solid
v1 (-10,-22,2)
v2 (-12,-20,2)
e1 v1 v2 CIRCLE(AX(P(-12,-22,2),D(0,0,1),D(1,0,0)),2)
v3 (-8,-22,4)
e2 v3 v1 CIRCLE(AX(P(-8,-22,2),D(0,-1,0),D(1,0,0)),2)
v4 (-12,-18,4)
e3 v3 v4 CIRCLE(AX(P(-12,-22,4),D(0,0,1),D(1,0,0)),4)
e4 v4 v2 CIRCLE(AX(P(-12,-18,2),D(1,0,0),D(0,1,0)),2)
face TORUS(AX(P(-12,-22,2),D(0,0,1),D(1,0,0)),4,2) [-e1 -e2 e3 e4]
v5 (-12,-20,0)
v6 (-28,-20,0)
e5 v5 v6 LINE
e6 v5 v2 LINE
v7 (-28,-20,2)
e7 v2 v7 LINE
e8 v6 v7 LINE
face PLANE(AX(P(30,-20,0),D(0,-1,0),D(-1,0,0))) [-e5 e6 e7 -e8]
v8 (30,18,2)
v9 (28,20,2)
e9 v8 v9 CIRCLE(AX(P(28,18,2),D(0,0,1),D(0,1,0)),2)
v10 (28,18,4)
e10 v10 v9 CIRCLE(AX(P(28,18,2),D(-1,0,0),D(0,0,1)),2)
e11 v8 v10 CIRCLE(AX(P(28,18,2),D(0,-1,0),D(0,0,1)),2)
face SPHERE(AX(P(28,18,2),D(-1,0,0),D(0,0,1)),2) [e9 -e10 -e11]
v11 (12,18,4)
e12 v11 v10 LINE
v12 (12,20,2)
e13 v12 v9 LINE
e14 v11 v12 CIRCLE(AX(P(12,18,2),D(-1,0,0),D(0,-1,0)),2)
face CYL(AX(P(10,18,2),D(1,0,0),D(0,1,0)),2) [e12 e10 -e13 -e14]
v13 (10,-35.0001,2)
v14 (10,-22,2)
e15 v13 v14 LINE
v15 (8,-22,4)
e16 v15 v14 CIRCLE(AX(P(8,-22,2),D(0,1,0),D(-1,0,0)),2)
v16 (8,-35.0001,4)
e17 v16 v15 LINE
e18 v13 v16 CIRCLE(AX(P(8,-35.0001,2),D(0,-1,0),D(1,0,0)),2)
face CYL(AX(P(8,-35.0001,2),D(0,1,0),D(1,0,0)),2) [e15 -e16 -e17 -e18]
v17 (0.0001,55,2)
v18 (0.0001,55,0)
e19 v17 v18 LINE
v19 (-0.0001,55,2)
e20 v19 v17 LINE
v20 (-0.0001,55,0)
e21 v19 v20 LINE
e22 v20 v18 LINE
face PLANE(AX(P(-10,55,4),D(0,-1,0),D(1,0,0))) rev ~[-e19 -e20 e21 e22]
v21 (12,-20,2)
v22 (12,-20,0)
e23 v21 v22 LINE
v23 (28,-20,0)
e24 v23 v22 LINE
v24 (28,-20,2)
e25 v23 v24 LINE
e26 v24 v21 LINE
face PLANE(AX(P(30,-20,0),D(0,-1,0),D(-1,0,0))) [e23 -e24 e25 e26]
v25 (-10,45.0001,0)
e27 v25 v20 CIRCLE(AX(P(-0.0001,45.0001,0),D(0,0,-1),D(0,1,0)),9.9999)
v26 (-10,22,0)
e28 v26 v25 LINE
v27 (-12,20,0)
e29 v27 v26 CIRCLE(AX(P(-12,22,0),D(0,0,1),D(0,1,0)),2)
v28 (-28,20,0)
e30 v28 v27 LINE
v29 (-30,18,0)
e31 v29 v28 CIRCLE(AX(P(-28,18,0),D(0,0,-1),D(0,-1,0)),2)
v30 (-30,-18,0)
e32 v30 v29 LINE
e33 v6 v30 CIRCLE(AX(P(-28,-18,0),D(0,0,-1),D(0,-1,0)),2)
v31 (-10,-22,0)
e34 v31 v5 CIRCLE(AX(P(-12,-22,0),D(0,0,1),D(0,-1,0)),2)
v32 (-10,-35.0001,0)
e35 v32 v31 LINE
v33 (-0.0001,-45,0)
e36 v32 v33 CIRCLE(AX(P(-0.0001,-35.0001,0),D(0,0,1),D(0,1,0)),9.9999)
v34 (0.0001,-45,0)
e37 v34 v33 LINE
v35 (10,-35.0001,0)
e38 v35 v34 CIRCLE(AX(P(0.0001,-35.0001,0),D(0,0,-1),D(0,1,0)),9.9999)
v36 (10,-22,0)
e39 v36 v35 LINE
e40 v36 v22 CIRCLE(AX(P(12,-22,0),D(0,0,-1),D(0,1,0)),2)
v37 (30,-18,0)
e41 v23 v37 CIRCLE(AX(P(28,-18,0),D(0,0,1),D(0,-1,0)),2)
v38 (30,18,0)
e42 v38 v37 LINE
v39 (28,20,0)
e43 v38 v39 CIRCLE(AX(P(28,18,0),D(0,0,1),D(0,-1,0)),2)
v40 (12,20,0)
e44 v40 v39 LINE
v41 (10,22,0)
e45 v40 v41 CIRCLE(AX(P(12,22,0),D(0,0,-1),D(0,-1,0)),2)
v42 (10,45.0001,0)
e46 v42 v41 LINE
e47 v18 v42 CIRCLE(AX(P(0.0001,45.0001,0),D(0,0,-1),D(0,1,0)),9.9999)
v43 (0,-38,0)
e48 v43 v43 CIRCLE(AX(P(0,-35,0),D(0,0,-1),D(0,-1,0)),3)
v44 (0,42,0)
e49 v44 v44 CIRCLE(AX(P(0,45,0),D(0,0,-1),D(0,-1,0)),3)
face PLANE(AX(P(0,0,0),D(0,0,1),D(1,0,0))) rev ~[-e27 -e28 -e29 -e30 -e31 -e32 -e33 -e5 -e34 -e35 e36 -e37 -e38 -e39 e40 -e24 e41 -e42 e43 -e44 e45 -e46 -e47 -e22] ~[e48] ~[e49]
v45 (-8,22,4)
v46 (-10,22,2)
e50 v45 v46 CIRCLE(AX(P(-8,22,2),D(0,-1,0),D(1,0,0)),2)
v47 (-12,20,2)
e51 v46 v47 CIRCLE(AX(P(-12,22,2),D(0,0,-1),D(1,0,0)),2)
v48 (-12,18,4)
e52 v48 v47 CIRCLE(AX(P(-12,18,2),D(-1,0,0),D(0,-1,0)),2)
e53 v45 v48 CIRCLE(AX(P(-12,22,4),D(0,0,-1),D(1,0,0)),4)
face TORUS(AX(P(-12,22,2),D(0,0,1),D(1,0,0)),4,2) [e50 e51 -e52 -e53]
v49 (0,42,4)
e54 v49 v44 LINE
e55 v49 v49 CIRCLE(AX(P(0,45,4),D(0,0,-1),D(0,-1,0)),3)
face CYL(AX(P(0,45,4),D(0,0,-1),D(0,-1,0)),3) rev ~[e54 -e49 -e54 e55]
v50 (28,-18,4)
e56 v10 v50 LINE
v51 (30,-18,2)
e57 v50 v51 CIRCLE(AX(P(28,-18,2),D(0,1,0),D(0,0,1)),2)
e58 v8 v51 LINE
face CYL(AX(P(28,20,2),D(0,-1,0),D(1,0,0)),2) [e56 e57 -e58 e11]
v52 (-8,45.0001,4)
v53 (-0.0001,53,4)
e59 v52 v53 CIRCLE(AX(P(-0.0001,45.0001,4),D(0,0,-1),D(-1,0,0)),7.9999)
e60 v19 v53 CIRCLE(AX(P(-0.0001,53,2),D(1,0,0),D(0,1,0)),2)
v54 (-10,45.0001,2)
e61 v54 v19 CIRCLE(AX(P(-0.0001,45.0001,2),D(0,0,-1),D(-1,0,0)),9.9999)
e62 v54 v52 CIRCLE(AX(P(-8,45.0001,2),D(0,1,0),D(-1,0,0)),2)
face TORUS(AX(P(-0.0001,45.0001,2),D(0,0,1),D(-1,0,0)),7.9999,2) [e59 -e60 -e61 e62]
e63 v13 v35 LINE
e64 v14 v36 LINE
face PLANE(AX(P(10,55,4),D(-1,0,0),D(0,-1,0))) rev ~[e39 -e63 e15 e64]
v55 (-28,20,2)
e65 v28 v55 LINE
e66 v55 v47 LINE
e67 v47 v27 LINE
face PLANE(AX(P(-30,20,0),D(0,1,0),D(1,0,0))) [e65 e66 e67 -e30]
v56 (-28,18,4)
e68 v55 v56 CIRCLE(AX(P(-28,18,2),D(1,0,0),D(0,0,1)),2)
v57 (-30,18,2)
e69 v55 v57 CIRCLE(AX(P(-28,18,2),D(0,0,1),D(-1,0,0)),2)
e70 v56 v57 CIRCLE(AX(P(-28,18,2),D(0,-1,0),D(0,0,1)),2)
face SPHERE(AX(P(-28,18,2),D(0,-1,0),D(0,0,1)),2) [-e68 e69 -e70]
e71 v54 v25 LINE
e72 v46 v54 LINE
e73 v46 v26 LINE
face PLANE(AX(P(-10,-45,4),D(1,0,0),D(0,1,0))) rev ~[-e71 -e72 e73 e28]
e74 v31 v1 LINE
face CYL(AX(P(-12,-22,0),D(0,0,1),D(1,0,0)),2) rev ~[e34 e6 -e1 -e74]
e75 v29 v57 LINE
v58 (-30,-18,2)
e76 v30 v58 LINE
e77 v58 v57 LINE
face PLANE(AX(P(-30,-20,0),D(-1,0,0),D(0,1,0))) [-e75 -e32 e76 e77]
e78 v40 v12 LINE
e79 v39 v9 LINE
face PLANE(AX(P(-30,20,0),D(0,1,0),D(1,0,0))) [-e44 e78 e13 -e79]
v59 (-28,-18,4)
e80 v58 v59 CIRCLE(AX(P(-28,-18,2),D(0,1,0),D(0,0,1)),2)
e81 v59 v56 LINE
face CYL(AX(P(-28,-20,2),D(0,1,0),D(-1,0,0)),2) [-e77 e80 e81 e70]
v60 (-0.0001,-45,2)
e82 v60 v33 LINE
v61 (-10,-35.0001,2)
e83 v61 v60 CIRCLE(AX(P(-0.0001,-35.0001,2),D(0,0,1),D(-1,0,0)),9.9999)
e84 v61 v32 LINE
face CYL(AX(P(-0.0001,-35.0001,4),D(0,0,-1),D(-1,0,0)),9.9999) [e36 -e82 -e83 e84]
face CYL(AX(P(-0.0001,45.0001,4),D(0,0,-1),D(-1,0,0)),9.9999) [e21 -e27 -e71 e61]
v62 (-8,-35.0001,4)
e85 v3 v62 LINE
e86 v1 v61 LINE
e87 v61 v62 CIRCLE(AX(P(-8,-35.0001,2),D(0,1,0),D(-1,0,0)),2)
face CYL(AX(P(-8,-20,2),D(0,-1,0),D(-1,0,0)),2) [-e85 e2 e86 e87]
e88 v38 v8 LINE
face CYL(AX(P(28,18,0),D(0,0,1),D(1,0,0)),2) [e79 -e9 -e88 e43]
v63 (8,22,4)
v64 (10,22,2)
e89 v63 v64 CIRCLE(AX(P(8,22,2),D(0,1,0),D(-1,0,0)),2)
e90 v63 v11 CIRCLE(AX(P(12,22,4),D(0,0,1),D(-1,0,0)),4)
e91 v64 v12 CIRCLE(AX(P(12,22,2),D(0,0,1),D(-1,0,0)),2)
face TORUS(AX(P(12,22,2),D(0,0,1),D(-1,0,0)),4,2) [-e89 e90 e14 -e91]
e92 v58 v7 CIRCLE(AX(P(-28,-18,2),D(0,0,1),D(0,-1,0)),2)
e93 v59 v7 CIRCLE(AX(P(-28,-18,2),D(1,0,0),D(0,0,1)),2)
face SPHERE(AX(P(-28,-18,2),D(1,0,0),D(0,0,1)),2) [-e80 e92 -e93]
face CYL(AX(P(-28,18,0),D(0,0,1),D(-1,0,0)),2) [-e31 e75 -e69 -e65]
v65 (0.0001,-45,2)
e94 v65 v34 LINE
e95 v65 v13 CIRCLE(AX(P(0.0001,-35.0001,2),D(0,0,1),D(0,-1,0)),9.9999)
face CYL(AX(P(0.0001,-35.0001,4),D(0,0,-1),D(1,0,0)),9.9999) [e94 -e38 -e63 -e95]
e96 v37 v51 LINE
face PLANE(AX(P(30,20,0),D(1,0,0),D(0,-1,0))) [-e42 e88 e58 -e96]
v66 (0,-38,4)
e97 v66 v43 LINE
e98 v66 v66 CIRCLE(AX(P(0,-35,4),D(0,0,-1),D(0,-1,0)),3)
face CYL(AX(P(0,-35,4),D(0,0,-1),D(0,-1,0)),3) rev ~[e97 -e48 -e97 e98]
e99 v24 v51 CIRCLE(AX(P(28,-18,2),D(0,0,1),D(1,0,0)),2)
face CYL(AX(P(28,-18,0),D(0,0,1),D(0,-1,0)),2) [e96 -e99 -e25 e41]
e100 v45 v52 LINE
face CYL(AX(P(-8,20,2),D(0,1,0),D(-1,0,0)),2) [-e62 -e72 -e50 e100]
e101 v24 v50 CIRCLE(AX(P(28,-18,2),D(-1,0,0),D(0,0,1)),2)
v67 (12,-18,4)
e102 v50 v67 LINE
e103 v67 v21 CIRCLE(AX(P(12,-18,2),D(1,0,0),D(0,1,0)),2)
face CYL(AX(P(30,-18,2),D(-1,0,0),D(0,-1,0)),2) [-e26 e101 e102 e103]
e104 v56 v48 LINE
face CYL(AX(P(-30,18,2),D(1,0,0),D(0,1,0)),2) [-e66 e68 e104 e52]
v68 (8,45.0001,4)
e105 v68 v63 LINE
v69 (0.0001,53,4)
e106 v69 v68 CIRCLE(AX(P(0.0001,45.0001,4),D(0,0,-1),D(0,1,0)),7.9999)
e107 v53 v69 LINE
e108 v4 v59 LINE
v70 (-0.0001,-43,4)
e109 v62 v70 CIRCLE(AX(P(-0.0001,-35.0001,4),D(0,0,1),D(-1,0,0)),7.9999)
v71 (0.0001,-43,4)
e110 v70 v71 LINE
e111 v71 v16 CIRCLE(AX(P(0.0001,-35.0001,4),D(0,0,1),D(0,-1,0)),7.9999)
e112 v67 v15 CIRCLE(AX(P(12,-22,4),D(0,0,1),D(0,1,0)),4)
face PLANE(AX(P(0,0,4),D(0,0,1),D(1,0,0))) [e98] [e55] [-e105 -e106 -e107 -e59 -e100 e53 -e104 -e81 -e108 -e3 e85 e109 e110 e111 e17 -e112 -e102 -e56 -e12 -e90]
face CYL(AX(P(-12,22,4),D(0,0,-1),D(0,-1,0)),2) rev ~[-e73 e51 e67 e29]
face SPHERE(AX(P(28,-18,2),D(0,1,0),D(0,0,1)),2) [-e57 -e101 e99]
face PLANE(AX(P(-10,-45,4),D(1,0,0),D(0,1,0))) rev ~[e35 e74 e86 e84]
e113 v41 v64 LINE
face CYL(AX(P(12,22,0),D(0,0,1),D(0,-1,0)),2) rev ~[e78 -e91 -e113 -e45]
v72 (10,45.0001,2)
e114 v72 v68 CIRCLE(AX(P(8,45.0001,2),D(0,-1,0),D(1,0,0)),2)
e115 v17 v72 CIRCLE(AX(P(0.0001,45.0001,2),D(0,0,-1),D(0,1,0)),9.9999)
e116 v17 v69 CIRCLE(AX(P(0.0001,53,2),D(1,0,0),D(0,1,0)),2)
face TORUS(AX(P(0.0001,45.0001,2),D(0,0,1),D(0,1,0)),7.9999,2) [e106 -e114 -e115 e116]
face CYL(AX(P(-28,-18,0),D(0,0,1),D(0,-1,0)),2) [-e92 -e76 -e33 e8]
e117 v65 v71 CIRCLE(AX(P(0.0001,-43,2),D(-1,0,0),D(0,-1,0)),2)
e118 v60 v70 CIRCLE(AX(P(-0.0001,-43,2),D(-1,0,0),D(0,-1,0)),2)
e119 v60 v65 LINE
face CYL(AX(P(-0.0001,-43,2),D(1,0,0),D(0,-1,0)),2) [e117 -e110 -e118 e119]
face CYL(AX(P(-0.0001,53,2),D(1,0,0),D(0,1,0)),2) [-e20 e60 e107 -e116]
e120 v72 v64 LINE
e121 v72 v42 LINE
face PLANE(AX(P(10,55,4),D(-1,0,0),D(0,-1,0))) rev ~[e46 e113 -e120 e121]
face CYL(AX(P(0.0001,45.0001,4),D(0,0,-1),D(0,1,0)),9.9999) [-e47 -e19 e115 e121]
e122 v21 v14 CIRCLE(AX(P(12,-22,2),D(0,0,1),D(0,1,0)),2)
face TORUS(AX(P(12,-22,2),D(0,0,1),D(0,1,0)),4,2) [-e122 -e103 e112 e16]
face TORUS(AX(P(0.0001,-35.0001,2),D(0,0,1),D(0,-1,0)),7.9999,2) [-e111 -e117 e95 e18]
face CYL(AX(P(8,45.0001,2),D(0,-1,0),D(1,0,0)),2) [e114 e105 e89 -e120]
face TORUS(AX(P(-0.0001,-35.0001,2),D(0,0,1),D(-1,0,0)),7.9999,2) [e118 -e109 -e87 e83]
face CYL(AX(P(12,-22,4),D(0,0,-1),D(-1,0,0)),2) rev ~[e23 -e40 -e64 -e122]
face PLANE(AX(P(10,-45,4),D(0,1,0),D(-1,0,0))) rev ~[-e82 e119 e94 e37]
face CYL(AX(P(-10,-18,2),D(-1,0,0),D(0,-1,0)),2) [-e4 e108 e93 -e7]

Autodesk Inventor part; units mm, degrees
ref_plane "YZ Plane" through (0, 0, 0) normal (1, 0, 0) x (0, 1, 0)
ref_plane "XZ Plane" through (0, 0, 0) normal (0, 1, 0) x (-1, 0, 0)
ref_plane "XY Plane" through (0, 0, 0) normal (0, 0, 1) x (1, 0, 0)
sketch "スケッチ1" plane through (0, 0, 0) normal (0, 0, 1) x (1, 0, 0)
  line L0 (-30, 20) -> (30, 20)
  line L1 (30, 20) -> (30, -20)
  line L2 (30, -20) -> (-30, -20)
  line L3 (-30, -20) -> (-30, 20)
  line L4 (-30, 20) -> (30, -20) construction
  line L5 (30, 20) -> (-30, -20) construction
  point P0 (0, 0)
  dimension "d0" = 60
  dimension "d1" = 40
extrude "押し出し1" add sketch "スケッチ1" along normal blind 4
sketch "スケッチ2" plane through (0, 0, 4) normal (0, 0, 1) x (1, 0, 0)
  line L0 (-10, 55) -> (10, 55)
  line L1 (10, 55) -> (10, -45)
  line L2 (10, -45) -> (-10, -45)
  line L3 (-10, -45) -> (-10, 55)
  point P0 (0, 0)
  dimension "d4" = 20
  dimension "d5" = 100
  dimension "d6" = 10
  dimension "d7" = 55
extrude "押し出し2" add sketch "スケッチ2" against normal blind 4
fillet "フィレット1" radius 10 4 edges at (10, 55, 2) (-10, 55, 2) (10, -45, 2) (-10, -45, 2)
fillet "フィレット2" radius 2 22 edges at (10, 32.5001, 4) (-10, 32.5001, 4) (-7.0711, 52.0711, 4) (7.0711, 52.0711, 4) (20, 20, 4) (30, 0, 4) (20, -20, 4) (-7.0711, -42.0711, 4) (7.0711, -42.0711, 4) (-10, -27.5001, 4) (10, -27.5, 4) (-20, -20, 4) (-30, 0, 4) (-20, 20, 4) (-30, 20, 2) (-10, 20, 2) (-30, -20, 2) (-10, -20, 2) (10, -20, 2) (30, -20, 2) (30, 20, 2) (10, 20, 2)
sketch "スケッチ3" plane through (0, 0, 4) normal (0, 0, 1) x (1, 0, 0)
  arc A0 (10, 45) -> (-10, 45) centre (0, 45) ccw projected
  arc A1 (-10, -35) -> (10, -35) centre (0, -35) ccw projected
  point P0 (0, 0)
  dimension "d12" = 0
  dimension "d13" = 0
hole "穴1" at (0, -35, 4) at (0, 45, 4) direction (0, 0, -1) diameter 6 end through all
properties part number "joy_mount_T"
